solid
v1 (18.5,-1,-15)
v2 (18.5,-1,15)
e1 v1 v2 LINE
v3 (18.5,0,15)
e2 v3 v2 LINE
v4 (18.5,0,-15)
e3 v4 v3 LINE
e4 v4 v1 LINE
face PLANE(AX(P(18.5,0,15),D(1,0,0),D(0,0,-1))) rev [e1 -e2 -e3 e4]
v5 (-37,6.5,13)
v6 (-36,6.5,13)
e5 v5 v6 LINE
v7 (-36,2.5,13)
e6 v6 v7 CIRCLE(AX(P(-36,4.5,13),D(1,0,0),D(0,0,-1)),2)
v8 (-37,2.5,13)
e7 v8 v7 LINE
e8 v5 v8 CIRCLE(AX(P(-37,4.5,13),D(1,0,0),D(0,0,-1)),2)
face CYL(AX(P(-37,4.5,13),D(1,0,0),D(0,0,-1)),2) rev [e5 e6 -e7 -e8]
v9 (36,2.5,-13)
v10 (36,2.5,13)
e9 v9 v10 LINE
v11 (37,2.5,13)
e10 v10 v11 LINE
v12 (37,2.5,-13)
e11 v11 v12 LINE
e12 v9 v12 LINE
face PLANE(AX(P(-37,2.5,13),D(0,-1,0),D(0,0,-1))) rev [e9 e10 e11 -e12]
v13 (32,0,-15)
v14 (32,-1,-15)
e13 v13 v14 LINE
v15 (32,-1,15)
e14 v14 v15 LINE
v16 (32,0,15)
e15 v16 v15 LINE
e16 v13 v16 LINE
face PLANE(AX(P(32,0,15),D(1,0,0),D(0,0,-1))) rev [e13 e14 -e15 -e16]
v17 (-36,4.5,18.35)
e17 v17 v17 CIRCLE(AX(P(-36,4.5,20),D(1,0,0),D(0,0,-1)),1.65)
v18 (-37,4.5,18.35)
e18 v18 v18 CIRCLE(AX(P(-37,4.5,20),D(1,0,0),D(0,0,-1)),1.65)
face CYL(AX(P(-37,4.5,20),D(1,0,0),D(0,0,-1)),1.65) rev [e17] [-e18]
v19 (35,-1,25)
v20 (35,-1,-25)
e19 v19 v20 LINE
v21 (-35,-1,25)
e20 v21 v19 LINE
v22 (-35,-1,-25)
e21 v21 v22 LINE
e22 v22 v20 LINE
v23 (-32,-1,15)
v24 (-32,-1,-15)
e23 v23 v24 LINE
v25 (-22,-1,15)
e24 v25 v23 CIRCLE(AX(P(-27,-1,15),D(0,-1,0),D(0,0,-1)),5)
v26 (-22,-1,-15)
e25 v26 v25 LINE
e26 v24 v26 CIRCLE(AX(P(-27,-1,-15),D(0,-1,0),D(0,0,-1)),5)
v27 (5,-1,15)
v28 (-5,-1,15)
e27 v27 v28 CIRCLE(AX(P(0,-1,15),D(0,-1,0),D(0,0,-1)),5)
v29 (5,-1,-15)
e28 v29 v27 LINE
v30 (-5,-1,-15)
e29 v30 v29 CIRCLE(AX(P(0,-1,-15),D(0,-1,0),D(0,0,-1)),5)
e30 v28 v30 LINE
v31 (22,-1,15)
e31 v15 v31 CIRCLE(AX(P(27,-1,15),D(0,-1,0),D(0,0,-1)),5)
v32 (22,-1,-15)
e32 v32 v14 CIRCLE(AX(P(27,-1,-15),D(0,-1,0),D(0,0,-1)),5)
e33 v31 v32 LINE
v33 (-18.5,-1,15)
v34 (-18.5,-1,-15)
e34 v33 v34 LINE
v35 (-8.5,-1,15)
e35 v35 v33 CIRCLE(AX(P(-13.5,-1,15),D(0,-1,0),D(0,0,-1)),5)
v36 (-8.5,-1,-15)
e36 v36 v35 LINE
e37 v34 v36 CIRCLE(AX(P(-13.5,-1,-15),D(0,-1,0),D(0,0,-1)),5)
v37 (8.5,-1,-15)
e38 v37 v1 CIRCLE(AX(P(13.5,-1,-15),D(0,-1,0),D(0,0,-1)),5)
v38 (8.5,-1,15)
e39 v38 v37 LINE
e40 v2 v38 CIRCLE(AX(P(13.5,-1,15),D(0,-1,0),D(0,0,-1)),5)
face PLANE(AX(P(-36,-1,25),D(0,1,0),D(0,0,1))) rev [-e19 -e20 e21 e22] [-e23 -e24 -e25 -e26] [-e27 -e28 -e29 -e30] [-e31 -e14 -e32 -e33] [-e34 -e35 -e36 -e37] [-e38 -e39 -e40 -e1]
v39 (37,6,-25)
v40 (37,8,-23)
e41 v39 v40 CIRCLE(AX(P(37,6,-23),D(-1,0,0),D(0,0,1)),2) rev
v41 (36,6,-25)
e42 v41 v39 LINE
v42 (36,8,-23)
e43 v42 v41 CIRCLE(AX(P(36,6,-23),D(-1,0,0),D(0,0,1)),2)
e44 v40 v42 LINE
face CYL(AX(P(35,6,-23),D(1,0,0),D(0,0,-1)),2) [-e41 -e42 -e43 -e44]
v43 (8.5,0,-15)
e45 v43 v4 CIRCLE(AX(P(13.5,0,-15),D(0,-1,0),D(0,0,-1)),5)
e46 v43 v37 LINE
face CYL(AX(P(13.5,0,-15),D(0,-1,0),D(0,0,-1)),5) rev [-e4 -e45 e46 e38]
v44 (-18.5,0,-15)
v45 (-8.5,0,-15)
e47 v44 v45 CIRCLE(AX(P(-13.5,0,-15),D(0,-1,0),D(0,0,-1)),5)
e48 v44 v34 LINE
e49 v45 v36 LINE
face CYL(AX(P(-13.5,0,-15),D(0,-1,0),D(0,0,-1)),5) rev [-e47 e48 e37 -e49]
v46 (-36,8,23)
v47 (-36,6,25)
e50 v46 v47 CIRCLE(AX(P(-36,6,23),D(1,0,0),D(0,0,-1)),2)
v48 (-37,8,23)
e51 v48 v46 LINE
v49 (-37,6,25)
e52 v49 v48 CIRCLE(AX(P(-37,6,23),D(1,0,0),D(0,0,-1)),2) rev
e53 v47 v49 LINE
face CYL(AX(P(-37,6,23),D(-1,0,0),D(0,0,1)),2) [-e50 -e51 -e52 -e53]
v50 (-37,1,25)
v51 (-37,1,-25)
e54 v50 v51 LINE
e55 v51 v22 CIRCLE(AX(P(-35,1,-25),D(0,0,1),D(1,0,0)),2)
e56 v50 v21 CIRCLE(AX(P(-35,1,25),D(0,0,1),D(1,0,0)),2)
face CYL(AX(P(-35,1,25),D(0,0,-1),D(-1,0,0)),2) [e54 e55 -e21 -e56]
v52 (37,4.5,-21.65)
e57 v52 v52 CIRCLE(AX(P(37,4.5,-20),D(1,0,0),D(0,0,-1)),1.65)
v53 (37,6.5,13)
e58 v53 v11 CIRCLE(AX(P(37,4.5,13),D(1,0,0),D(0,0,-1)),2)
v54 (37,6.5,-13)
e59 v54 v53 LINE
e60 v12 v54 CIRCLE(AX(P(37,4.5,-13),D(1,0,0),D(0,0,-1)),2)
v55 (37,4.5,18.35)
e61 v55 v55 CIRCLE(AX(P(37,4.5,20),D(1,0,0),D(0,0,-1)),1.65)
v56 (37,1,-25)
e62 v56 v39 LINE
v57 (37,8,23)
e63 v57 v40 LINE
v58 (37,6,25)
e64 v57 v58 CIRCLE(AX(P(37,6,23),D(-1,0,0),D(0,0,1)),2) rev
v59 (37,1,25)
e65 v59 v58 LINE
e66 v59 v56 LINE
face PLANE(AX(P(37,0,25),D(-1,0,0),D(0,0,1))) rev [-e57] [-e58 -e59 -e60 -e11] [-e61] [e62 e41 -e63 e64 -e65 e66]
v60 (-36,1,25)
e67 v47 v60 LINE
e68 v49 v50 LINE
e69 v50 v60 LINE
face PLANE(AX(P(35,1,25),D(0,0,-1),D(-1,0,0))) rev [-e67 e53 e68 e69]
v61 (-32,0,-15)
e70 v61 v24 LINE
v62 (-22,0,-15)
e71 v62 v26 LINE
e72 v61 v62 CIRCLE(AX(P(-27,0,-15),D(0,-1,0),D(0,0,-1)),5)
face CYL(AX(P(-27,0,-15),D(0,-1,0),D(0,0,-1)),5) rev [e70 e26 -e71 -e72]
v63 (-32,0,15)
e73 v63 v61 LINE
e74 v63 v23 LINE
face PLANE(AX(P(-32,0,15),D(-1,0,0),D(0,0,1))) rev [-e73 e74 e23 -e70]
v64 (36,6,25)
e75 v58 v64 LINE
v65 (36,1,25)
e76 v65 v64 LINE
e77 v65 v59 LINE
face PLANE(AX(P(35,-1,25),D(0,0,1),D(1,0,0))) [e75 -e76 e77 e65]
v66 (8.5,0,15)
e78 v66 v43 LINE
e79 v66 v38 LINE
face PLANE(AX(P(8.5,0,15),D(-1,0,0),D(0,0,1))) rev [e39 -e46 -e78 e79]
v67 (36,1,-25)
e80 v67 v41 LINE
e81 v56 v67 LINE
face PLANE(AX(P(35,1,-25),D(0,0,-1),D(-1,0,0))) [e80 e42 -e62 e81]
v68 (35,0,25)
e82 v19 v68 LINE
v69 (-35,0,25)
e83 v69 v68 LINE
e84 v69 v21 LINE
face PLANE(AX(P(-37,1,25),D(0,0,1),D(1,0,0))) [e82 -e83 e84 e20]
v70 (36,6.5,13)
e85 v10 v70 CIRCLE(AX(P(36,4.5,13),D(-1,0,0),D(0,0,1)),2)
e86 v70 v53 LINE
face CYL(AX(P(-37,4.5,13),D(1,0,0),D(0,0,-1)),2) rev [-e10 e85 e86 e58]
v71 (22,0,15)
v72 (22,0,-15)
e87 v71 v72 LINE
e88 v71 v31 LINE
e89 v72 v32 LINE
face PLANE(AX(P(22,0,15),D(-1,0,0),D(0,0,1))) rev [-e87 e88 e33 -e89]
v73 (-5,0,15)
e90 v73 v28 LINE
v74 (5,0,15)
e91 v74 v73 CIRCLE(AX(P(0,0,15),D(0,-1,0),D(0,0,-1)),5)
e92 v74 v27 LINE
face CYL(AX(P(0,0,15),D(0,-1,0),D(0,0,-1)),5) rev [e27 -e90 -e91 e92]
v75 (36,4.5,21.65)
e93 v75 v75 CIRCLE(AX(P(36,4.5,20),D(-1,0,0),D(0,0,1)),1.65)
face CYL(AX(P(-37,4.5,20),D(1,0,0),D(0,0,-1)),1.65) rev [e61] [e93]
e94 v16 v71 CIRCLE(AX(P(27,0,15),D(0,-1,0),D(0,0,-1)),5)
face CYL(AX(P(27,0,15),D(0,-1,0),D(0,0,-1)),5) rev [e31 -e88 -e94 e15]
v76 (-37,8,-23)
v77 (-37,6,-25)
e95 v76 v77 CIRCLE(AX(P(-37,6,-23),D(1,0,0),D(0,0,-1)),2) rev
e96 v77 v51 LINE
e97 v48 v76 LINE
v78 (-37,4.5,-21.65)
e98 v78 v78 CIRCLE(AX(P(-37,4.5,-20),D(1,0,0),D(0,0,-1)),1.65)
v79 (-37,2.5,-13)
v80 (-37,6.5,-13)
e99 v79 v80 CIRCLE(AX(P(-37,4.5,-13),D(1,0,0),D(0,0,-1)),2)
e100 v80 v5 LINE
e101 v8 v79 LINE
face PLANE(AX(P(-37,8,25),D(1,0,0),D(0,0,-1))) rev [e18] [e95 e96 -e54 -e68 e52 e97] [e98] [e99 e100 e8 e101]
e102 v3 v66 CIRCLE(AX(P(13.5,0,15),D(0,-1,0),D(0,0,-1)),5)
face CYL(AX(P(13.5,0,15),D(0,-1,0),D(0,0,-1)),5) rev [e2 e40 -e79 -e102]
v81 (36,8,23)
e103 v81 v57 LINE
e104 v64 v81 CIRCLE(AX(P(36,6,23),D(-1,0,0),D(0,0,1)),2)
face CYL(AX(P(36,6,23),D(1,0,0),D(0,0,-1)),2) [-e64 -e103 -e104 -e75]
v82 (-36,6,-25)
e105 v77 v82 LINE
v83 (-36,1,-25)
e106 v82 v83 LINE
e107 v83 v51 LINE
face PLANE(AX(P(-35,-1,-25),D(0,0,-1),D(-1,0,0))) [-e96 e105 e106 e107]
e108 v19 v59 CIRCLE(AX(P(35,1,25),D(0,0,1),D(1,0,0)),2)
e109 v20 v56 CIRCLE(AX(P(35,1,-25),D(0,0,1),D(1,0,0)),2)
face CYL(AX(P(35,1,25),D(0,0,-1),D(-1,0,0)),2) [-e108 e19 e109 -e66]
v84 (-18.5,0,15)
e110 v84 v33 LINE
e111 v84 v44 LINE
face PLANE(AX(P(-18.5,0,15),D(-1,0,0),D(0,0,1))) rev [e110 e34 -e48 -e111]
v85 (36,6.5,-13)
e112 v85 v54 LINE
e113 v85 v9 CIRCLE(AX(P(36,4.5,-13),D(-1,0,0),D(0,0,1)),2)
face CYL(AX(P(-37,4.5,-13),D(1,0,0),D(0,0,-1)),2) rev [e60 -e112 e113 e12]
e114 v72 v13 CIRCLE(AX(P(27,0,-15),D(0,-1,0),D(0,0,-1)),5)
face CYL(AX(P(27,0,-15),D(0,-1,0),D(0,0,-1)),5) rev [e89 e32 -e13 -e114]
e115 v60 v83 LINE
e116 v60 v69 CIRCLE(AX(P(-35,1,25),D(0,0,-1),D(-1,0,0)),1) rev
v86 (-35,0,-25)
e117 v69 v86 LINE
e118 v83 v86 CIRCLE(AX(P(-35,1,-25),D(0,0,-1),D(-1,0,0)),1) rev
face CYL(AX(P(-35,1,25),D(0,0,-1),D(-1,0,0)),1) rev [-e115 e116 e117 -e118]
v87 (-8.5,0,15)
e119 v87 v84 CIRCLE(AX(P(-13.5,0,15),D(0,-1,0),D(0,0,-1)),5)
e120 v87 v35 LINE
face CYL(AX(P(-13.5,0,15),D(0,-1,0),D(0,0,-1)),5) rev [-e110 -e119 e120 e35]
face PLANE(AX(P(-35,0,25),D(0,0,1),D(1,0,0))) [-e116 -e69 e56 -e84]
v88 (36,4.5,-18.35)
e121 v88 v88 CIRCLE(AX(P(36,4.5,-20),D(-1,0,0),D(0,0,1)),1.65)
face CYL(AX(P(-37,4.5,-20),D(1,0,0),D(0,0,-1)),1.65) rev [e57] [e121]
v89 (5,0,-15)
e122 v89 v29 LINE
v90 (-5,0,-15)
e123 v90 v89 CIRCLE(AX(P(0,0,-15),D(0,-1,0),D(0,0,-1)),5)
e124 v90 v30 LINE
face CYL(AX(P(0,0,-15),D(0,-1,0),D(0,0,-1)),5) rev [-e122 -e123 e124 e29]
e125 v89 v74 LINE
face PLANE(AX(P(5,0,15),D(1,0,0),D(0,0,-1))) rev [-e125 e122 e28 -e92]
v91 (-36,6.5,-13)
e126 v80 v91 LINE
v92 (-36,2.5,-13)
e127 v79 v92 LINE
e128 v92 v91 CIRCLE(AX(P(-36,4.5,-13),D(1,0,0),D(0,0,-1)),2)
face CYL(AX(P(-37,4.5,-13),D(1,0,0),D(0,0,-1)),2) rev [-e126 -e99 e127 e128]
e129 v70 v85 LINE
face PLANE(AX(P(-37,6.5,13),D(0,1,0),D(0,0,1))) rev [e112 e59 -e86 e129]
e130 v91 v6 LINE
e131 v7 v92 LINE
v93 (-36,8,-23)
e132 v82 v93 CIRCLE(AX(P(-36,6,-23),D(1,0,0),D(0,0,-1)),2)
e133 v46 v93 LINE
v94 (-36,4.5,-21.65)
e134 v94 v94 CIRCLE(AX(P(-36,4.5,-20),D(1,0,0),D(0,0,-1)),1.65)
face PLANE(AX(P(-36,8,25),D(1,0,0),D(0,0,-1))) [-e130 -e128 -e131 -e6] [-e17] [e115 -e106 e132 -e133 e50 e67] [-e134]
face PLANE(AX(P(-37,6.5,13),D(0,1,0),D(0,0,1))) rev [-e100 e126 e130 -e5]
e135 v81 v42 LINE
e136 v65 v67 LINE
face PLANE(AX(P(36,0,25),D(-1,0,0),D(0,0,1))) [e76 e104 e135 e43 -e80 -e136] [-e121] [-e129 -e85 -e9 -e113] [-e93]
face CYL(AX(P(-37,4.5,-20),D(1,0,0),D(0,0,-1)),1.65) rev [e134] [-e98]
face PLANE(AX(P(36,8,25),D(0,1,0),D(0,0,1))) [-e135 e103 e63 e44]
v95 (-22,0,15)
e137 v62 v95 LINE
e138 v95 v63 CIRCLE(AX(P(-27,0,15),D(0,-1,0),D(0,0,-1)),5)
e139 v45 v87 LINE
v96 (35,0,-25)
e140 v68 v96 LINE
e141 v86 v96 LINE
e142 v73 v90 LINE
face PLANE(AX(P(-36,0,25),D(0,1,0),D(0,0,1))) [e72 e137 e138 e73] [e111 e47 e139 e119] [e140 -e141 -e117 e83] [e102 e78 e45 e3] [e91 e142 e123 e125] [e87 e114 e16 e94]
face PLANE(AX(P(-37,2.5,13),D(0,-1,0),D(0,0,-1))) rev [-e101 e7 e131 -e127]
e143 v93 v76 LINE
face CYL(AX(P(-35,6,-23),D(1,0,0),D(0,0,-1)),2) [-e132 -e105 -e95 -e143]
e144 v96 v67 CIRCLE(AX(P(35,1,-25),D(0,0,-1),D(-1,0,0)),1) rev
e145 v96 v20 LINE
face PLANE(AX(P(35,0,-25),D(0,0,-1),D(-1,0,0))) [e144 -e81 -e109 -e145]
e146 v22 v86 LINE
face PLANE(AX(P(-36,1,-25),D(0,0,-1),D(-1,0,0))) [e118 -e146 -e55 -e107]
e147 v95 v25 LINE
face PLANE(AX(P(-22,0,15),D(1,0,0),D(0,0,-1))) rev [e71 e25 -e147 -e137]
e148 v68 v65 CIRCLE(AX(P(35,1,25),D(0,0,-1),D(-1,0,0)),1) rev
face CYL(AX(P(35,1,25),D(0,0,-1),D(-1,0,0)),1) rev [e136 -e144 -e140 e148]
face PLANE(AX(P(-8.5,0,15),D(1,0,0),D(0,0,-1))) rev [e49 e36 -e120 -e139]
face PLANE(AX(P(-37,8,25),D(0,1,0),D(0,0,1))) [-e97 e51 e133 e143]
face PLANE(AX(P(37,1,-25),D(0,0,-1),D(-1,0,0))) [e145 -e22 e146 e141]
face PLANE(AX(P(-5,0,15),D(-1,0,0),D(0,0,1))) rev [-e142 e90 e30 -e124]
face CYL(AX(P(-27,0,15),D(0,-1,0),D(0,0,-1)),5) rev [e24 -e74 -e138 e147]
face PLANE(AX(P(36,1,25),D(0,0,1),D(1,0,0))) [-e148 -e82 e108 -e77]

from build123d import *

# Parameters (mm, degrees)
SM_BASE_FLANGE_1_DEPTH   = 25
CUT_EXTRUDE_1_DEPTH      = 46.365184889
CUT_EXTRUDE_1_DEPTH_BACK = 46.365184889
SKETCH_6_R               = 1.65
CUT_EXTRUDE_2_DEPTH      = 10
FILLET_1_R               = 2


# Sheet-metal steps are written as plain solids
with BuildPart() as part:
    # Sketch 1 → 基体-法兰1 (new, symmetric)
    with BuildSketch(Plane.XY):
        with BuildLine():
            Line((-36, 8), (-36, 1))
            ThreePointArc((-36, 1), (-35.707106781, 0.292893219), (-35, 0))
            Line((-35, 0), (35, 0))
            ThreePointArc((35, 0), (35.707106781, 0.292893219), (36, 1))
            Line((36, 1), (36, 8))
            Line((36, 8), (37, 8))
            Line((37, 8), (37, 1))
            ThreePointArc((37, 1), (36.414213562, -0.414213562), (35, -1))
            Line((35, -1), (-35, -1))
            ThreePointArc((-35, -1), (-36.414213562, -0.414213562), (-37, 1))
            Line((-37, 1), (-37, 8))
            Line((-37, 8), (-36, 8))
        make_face()
    extrude(amount=SM_BASE_FLANGE_1_DEPTH, both=True)

    # 草图6 → 切除-拉伸1 (cut, two sides: drawn at the far end of the back side and taken through both)
    with BuildSketch(Plane(origin=(0, 0, 0), x_dir=(0, 0, -1), z_dir=(1, 0, 0)).offset(-CUT_EXTRUDE_1_DEPTH_BACK)):
        with Locations((-20, 4.5)):
            Circle(SKETCH_6_R)
        with Locations((20, 4.5)):
            Circle(SKETCH_6_R)
        with BuildLine():
            Line((-13, 6.5), (13, 6.5))
            ThreePointArc((13, 6.5), (15, 4.5), (13, 2.5))
            Line((13, 2.5), (-13, 2.5))
            ThreePointArc((-13, 2.5), (-15, 4.5), (-13, 6.5))
        make_face()
    extrude(amount=CUT_EXTRUDE_1_DEPTH + CUT_EXTRUDE_1_DEPTH_BACK, mode=Mode.SUBTRACT)

    # 草图7 → 切除-拉伸2 (cut)
    with BuildSketch(Plane.XZ.offset(1)):
        with BuildLine():
            Line((-22, 15), (-22, -15))
            ThreePointArc((-22, -15), (-27, -20), (-32, -15))
            Line((-32, -15), (-32, 15))
            ThreePointArc((-32, 15), (-27, 20), (-22, 15))
        make_face()
        with BuildLine():
            Line((-8.5, 15), (-8.5, -15))
            ThreePointArc((-8.5, -15), (-13.5, -20), (-18.5, -15))
            Line((-18.5, -15), (-18.5, 15))
            ThreePointArc((-18.5, 15), (-13.5, 20), (-8.5, 15))
        make_face()
        with BuildLine():
            Line((5, 15), (5, -15))
            ThreePointArc((5, -15), (0, -20), (-5, -15))
            Line((-5, -15), (-5, 15))
            ThreePointArc((-5, 15), (0, 20), (5, 15))
        make_face()
        with BuildLine():
            Line((18.5, 15), (18.5, -15))
            ThreePointArc((18.5, -15), (13.5, -20), (8.5, -15))
            Line((8.5, -15), (8.5, 15))
            ThreePointArc((8.5, 15), (13.5, 20), (18.5, 15))
        make_face()
        with BuildLine():
            Line((32, 15), (32, -15))
            ThreePointArc((32, -15), (27, -20), (22, -15))
            Line((22, -15), (22, 15))
            ThreePointArc((22, 15), (27, 20), (32, 15))
        make_face()
    extrude(amount=-CUT_EXTRUDE_2_DEPTH, mode=Mode.SUBTRACT)

    # 圆角1
    fillet_1_edges = [part.edges().sort_by_distance(p)[0] for p in [
        (-36.5, 8, -25),
        (36.5, 8, -25),
        (-36.5, 8, 25),
        (36.5, 8, 25),
    ]]
    fillet(fillet_1_edges, radius=FILLET_1_R)


solid = part.part
